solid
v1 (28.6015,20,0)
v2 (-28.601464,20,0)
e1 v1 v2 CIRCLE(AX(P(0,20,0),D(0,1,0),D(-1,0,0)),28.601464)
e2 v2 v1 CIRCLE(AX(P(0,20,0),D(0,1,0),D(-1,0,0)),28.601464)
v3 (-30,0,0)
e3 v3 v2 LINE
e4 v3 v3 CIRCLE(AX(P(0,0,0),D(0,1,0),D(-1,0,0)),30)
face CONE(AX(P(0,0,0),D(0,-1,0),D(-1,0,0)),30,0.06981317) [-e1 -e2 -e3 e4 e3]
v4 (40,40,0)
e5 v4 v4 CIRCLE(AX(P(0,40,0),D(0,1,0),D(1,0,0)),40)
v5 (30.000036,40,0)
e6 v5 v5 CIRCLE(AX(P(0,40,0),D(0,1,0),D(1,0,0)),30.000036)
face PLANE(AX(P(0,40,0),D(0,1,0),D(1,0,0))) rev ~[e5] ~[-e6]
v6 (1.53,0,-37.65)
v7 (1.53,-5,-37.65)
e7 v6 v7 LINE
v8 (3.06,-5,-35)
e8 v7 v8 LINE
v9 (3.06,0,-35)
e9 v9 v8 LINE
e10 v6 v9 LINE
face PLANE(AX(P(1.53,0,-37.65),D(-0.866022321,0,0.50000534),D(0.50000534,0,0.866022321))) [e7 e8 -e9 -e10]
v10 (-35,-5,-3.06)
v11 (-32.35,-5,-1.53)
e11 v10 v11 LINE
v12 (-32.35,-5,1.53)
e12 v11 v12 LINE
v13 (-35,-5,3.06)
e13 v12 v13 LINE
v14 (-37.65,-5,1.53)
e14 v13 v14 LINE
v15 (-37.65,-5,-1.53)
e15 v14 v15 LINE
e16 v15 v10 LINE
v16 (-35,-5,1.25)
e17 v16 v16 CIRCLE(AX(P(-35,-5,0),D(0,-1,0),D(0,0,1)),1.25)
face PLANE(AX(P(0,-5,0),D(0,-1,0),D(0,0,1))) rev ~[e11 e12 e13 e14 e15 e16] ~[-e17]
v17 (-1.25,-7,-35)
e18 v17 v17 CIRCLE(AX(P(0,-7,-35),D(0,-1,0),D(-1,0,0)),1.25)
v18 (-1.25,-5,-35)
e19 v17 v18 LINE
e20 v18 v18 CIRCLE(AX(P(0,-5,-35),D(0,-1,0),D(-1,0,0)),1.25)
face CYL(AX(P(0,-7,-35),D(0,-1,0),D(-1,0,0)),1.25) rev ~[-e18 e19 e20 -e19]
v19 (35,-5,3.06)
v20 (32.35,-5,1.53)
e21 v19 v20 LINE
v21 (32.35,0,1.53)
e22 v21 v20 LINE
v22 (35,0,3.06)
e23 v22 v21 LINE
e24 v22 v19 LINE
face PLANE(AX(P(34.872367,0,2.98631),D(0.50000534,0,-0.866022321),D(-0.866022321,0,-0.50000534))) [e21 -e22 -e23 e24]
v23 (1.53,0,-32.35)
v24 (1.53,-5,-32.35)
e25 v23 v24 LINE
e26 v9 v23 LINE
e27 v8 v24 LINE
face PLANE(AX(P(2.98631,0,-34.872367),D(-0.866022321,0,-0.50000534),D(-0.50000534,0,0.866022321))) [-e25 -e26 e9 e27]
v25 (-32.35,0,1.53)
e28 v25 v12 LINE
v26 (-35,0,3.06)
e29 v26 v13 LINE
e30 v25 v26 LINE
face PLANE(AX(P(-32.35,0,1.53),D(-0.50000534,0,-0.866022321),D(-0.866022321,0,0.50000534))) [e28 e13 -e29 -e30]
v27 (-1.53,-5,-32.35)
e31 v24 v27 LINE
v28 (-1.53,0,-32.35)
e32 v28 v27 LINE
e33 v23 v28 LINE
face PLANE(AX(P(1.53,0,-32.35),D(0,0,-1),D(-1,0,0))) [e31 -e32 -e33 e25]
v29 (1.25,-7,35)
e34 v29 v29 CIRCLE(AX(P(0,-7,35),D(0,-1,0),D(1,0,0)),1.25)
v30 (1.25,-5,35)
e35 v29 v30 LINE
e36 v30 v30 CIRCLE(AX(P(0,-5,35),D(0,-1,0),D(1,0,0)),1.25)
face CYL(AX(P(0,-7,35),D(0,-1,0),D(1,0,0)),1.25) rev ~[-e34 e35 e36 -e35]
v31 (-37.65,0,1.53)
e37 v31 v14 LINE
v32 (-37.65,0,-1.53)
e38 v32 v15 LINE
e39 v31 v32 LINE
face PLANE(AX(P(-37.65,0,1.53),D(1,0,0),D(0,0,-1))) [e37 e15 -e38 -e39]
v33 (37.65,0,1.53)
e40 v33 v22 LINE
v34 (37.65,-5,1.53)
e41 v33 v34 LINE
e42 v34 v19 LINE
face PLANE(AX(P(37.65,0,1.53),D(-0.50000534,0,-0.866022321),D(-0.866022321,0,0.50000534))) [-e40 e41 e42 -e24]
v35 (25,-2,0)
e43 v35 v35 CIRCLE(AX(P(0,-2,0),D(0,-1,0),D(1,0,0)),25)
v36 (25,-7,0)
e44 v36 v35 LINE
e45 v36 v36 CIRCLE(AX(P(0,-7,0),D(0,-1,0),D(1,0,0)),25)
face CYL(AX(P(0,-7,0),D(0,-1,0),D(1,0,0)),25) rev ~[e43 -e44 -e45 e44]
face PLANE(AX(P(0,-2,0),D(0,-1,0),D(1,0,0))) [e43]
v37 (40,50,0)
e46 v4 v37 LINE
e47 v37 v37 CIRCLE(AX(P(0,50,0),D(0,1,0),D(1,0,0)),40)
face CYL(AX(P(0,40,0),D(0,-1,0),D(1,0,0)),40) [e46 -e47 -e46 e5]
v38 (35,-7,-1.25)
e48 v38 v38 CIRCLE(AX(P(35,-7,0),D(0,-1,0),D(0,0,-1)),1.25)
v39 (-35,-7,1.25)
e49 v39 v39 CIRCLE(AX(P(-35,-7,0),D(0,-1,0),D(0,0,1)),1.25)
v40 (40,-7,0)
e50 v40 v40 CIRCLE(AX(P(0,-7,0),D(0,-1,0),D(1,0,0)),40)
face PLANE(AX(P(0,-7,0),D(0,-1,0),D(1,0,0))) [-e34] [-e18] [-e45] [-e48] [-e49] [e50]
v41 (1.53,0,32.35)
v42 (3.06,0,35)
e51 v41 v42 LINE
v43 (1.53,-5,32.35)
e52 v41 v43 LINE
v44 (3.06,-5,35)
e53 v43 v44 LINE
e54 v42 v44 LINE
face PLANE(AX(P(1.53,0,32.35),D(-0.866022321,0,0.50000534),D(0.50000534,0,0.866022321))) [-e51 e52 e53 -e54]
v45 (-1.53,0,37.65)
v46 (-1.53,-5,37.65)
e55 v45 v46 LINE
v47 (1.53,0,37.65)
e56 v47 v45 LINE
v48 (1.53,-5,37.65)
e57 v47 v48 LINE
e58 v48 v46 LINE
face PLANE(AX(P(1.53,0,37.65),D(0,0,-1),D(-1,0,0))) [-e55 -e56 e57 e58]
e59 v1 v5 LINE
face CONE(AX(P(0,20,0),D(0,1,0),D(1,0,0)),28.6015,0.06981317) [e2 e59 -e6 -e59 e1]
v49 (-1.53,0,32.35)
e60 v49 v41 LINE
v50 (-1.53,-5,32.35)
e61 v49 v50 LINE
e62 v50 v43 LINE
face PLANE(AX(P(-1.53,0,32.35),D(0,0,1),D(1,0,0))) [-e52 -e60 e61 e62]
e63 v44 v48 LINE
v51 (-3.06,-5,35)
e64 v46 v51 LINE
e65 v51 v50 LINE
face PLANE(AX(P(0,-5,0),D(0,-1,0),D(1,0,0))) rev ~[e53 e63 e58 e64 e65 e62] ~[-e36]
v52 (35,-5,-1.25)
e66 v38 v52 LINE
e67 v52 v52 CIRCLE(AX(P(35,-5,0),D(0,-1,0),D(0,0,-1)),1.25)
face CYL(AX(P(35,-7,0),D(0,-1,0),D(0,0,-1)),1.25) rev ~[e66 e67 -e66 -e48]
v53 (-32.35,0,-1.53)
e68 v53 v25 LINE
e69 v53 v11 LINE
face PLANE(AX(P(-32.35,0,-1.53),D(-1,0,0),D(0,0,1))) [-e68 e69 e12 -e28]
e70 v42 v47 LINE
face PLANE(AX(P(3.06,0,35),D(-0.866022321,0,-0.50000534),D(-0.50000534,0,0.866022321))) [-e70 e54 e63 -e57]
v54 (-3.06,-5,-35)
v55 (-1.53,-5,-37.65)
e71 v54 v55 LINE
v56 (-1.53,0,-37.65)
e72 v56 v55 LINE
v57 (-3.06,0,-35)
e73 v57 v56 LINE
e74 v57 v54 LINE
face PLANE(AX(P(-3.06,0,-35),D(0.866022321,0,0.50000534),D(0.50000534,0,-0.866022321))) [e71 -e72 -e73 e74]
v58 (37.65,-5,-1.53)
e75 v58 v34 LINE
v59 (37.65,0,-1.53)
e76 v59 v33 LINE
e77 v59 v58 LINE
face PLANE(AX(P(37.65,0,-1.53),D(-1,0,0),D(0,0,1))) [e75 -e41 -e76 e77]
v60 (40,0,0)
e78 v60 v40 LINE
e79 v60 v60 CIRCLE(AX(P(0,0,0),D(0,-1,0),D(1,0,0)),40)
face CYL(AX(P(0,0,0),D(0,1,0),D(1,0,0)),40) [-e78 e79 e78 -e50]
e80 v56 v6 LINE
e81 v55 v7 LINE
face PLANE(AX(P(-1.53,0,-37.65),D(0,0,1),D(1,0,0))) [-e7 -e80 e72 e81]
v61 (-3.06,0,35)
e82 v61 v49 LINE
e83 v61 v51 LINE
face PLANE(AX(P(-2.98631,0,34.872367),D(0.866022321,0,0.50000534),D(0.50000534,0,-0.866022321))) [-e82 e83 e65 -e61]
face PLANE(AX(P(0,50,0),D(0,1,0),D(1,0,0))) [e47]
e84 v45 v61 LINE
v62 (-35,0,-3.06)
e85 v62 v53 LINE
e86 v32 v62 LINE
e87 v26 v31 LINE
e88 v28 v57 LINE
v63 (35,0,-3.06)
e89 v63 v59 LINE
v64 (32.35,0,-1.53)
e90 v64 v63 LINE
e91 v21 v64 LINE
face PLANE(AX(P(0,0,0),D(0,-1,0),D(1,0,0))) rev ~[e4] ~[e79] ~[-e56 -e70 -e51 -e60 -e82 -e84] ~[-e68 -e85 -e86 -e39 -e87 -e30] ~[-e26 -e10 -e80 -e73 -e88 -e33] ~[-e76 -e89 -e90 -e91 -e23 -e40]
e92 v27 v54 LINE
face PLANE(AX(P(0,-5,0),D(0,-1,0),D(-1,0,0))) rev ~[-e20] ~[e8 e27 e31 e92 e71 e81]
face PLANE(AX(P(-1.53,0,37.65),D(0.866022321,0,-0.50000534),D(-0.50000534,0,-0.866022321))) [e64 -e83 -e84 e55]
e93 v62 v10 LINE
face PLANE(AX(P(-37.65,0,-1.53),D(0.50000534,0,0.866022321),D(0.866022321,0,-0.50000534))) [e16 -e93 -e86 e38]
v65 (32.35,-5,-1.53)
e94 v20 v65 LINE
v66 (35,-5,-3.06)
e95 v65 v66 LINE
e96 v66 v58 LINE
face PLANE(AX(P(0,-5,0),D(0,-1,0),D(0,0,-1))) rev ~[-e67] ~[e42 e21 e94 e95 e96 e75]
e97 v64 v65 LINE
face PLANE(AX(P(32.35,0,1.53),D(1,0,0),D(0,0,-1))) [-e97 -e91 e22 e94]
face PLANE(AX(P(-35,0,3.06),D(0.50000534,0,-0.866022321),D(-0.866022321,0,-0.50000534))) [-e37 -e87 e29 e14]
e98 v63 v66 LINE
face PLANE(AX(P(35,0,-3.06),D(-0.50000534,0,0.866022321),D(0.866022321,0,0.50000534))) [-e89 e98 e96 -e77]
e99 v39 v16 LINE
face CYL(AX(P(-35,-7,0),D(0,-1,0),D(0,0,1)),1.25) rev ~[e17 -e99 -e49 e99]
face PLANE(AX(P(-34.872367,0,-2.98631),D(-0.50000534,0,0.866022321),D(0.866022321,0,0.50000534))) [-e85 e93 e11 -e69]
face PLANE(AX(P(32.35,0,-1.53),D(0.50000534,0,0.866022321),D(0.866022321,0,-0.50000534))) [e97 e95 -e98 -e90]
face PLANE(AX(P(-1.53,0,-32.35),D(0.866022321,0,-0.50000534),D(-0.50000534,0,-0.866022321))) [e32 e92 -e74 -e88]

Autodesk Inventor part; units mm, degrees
ref_plane "YZ Plane" through (0, 0, 0) normal (1, 0, 0) x (0, 1, 0)
ref_plane "XZ Plane" through (0, 0, 0) normal (0, 1, 0) x (-1, 0, 0)
ref_plane "XY Plane" through (0, 0, 0) normal (0, 0, 1) x (1, 0, 0)
sketch "Sketch1" plane through (0, 0, 0) normal (0, 1, 0) x (-1, 0, 0)
  circle A0 centre (0, 0) radius 30
  circle A1 centre (0, 0) radius 45
  circle A2 centre (0, 0) radius 20
  dimension "d0" = 60
  dimension "d1" = 90
  dimension "d2" = 40
extrude "Extrusion1" add sketch "Sketch1" along normal blind 20 draft -4 contours A0
sketch "Sketch2" plane through (0, 20, 0) normal (0, 1, 0) x (1, 0, 0)
  circle A0 centre (0, 0) radius 28.6015
  circle A1 centre (0, 0) radius 21.3985
extrude "Extrusion2" add sketch "Sketch2" along normal blind 20 draft 4
sketch "Sketch3" plane through (0, 40, 0) normal (0, 1, 0) x (1, 0, 0)
  circle A0 centre (0, 0) radius 40
  dimension "d7" = 80
extrude "Extrusion3" add sketch "Sketch3" along normal blind 10
sketch "Sketch4" plane through (0, 0, 0) normal (0, -1, 0) x (1, 0, 0)
  circle A0 centre (0, 0) radius 40
  dimension "d10" = 80
extrude "Extrusion4" add sketch "Sketch4" along normal blind 10
ref_plane "Work Plane1" through (0, -8, 0) normal (0, -1, 0) x (1, 0, 0)
sketch "Sketch7" plane through (0, -10, 0) normal (0, -1, 0) x (1, 0, 0)
  circle A0 centre (0, 0) radius 40
extrude "Extrusion12" cut sketch "Sketch7" against normal blind 3
sketch "Sketch8" plane through (0, -7, 0) normal (0, -1, 0) x (1, 0, 0)
  circle A0 centre (0, 0) radius 25
  dimension "d42" = 50
extrude "Extrusion13" cut sketch "Sketch8" against normal blind 5
sketch "Sketch9" plane through (0, 0, 0) normal (0, 1, 0) x (1, 0, 0)
  circle A0 centre (0, 0) radius 35
  line L0 (-37.65, 1.53) -> (-35, 3.06)
  line L1 (-35, 3.06) -> (-32.35, 1.53)
  line L2 (-32.35, 1.53) -> (-32.35, -1.53)
  line L3 (-32.35, -1.53) -> (-35, -3.06)
  line L4 (-35, -3.06) -> (-37.65, -1.53)
  line L5 (-37.65, -1.53) -> (-37.65, 1.53)
  line L6 (0, 0) -> (-35, 0) construction
  circle A1 centre (-35, 0) radius 2.65
  point P0 (-33.675, 2.295)
  point P1 (-36.325, -2.295)
  dimension "d45" = 70
  dimension "d46" = 5.3
extrude "Extrusion14" cut sketch "Sketch9" against normal through all contours L1 A1 A0 | A0 A1 L0 L1 | L3 L4 A1 A0 | A0 A1 L3 | A1 A0 | A0 A1 | L1 L2 A1 | A1 L2 L3 | A1 L5 L0 | L4 L5 A1
pattern_circular "Circular Pattern1" count 4 over 360 about axis through (0, 0, 0) along (0, -1, 0) of "Extrusion14"
sketch "Sketch10" plane through (0, 0, 0) normal (0, 0, 1) x (1, 0, 0)
  point P0 (0, 0)
sketch "Sketch11" plane through (0, 0, 0) normal (0, 0, 1) x (1, 0, 0)
  line L0 (-24.5677, 41.8645) -> (0, 41.8645)
  line L1 (0, 41.8645) -> (0, 0)
  line L2 (0, 0) -> (-24.5677, 0)
  line L3 (-24.5677, 0) -> (-24.5677, 41.8645)
revolve "Revolution1" add sketch "Sketch11" angle 360 about axis through (0, 41.8645, 0) along (0, -1, 0)
sketch "Sketch12" plane through (0, -7, 0) normal (0, -1, 0) x (1, 0, 0)
  point P0 (0, 0)
sketch "Sketch13" plane through (0, -7, 0) normal (0, -1, 0) x (1, 0, 0)
  line L0 (0, 35) -> (0, 0) construction
  circle A0 centre (0, 35) radius 3.15
  circle A1 centre (0, 35) radius 1.25
  dimension "d53" = 35
  dimension "d54" = 6.3
  dimension "d57" = 2.5
extrude "Extrusion15" add sketch "Sketch13" against normal blind 2
pattern_circular "Circular Pattern2" count 4 over 360 about axis through (0, 0, 0) along (0, -1, 0) of "Extrusion15"
properties part number "spool" material "ABS Plastic"
